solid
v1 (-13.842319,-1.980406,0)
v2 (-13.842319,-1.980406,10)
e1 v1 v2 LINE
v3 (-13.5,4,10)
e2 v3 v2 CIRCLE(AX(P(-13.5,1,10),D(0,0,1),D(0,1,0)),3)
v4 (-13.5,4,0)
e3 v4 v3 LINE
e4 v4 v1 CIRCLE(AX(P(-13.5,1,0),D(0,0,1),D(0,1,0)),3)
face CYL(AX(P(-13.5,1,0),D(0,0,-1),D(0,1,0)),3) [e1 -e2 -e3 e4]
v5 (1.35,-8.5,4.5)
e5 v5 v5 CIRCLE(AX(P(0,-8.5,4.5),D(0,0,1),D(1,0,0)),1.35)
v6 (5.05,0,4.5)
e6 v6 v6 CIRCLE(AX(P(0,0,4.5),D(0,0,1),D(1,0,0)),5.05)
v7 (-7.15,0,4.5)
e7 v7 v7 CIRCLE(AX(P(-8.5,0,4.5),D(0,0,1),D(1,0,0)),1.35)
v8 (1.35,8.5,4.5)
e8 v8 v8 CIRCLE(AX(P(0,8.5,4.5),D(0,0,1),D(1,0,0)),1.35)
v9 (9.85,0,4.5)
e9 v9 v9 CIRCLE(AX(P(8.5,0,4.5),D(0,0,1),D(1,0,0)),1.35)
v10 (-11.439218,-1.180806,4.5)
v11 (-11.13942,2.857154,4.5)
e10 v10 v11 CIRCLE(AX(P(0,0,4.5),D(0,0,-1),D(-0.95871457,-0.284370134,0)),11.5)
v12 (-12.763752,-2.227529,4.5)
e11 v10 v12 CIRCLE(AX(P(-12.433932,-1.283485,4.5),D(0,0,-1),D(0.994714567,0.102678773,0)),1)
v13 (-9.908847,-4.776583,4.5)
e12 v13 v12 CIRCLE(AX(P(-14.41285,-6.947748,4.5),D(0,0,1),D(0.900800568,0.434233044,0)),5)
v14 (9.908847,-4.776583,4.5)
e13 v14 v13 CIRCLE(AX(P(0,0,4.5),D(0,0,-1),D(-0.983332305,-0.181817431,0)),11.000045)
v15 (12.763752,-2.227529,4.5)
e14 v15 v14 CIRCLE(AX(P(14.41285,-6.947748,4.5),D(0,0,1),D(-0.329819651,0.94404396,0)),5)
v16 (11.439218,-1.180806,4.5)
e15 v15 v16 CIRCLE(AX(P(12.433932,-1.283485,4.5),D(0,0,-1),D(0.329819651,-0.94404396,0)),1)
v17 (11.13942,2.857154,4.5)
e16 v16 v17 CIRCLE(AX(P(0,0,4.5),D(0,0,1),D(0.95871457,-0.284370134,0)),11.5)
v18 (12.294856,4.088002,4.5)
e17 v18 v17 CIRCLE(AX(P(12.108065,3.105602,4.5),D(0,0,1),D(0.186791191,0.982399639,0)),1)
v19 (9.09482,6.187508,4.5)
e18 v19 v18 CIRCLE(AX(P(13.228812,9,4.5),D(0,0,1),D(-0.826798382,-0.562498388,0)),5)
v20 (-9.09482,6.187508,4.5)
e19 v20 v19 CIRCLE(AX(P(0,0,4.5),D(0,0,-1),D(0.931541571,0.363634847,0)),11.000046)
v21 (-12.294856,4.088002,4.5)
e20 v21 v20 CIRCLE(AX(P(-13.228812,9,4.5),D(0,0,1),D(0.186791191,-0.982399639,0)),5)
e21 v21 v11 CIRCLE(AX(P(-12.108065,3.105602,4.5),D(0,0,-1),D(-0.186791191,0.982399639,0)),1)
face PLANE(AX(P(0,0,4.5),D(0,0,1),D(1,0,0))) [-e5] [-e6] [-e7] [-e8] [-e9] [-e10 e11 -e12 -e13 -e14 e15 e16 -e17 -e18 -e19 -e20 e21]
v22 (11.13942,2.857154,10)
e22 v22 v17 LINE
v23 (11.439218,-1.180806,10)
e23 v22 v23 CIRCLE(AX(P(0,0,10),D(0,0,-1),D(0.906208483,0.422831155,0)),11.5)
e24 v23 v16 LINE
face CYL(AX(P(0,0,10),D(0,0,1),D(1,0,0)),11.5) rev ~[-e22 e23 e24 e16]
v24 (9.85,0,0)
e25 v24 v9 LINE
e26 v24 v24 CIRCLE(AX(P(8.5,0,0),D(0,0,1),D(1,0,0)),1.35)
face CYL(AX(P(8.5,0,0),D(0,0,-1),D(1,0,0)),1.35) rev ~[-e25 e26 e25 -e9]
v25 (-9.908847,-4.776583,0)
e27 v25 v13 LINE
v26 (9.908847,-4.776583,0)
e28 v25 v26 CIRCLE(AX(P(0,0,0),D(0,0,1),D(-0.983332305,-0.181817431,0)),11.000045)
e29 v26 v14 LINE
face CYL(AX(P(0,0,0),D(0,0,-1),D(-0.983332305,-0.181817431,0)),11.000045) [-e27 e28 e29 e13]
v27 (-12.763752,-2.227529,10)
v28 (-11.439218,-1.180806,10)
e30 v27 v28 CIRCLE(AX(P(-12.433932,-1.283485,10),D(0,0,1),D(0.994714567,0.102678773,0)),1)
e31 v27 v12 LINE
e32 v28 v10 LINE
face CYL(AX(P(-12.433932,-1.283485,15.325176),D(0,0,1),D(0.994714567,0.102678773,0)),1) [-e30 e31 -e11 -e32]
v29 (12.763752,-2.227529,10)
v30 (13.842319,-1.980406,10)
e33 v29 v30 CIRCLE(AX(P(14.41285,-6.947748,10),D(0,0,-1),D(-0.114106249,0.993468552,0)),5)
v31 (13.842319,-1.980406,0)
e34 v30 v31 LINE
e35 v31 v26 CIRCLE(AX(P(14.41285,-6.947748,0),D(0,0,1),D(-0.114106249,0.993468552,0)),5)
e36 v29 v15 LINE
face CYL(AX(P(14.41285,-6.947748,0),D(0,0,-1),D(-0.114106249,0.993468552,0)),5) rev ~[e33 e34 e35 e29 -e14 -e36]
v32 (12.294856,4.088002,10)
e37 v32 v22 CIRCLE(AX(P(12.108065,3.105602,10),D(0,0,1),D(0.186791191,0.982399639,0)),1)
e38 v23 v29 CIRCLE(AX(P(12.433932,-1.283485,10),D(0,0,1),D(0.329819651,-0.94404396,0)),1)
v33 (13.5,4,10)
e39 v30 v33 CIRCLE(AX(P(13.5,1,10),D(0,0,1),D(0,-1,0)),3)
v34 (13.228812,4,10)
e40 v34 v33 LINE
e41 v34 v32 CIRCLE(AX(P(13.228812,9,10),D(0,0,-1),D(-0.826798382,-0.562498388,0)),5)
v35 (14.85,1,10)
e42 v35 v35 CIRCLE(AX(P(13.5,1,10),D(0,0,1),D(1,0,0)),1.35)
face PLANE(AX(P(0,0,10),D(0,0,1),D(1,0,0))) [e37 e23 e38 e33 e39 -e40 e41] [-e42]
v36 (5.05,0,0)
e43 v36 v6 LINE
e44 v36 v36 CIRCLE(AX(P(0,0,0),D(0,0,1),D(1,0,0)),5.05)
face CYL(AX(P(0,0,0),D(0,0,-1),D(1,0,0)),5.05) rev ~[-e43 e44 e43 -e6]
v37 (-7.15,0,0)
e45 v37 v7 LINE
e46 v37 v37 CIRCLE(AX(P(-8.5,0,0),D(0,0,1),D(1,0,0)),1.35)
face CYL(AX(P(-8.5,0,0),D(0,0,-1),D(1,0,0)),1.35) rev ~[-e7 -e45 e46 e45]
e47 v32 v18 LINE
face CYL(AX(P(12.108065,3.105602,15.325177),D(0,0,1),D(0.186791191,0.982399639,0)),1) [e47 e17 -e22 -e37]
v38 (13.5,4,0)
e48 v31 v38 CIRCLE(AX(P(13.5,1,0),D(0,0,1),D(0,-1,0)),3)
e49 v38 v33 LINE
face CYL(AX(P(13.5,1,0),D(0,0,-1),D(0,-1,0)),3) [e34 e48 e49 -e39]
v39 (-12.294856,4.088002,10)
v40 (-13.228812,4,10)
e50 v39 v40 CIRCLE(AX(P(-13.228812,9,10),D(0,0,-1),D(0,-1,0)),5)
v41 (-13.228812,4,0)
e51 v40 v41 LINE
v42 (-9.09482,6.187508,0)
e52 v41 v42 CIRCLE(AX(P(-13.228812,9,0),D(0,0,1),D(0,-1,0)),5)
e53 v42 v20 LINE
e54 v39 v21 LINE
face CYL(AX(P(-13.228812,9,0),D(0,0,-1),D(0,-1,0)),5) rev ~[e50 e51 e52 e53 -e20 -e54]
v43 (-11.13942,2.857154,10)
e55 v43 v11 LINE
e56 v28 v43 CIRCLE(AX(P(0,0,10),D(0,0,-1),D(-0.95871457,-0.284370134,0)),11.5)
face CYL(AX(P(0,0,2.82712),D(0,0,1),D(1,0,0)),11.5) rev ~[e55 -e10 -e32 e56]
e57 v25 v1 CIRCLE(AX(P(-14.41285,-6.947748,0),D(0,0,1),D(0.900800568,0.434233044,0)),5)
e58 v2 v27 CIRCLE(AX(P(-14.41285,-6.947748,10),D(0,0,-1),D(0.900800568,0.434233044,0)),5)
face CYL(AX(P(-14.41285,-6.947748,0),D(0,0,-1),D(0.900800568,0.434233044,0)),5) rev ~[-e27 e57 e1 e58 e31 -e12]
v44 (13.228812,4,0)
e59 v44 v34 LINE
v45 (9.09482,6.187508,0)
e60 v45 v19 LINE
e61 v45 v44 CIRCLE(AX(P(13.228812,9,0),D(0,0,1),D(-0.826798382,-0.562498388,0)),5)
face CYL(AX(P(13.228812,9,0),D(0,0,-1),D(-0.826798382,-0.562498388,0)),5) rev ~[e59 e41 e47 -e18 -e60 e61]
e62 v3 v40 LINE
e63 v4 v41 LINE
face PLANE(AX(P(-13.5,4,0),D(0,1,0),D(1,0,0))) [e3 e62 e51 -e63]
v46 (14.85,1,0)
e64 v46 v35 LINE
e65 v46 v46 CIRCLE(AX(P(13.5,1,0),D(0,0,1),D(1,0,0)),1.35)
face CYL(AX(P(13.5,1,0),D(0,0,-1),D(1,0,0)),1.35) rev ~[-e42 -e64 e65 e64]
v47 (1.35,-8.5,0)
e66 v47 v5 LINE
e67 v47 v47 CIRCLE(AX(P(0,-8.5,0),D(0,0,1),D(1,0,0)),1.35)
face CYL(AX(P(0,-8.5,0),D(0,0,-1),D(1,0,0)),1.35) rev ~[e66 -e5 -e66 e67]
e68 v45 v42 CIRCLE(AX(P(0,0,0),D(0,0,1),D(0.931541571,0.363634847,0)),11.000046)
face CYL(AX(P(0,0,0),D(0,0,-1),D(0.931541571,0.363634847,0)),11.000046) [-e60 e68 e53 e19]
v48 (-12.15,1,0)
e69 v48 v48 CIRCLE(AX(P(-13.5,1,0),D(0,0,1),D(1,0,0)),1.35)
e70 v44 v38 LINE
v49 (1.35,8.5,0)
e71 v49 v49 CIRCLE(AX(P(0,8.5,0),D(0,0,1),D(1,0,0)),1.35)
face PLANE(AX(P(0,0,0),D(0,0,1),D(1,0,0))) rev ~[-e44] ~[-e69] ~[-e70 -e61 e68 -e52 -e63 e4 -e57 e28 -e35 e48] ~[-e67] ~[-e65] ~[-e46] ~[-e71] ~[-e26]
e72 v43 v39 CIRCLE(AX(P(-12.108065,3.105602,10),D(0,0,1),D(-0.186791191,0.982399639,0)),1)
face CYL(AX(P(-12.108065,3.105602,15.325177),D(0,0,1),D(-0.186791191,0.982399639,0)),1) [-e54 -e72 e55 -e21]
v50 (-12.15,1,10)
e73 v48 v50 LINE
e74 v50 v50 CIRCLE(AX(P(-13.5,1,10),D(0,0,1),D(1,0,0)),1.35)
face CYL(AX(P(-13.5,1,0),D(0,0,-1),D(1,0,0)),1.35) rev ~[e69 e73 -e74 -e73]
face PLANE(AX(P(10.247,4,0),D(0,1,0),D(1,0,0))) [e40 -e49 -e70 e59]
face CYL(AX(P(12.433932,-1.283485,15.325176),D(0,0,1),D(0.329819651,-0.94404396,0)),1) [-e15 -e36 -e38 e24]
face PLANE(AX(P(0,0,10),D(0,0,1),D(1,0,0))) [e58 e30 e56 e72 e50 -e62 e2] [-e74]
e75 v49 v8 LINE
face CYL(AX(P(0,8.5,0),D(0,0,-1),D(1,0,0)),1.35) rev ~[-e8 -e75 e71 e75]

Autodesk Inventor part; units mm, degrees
ref_plane "YZ Plane" through (0, 0, 0) normal (1, 0, 0) x (0, 1, 0)
ref_plane "XZ Plane" through (0, 0, 0) normal (0, 1, 0) x (-1, 0, 0)
ref_plane "XY Plane" through (0, 0, 0) normal (0, 0, 1) x (1, 0, 0)
sketch "スケッチ1" plane through (0, 0, 0) normal (0, 0, 1) x (1, 0, 0)
  circle A0 centre (0, 0) radius 11 construction
  circle A1 centre (0, 8.5) radius 1.35
  circle A2 centre (-8.5, 0) radius 1.35
  circle A3 centre (0, -8.5) radius 1.35
  circle A4 centre (8.5, 0) radius 1.35
  circle A5 centre (0, 0) radius 5.05
  circle A6 centre (-13.5, 1) radius 1.35
  circle A7 centre (13.5, 1) radius 1.35
  line L0 (-13.5, 15.0392) -> (13.5, 15.0392) construction
  line L1 (13.5, 15.0392) -> (13.5, 1) construction
  line L2 (13.5, 1) -> (-13.5, 1) construction
  line L3 (-13.5, 1) -> (-13.5, 15.0392) construction
  line L4 (-13.5, 4) -> (-10.247, 4)
  arc A8 (-13.5, 4) -> (-13.5, -2) centre (-13.5, 1) ccw
  line L5 (-13.5, -2) -> (-10.8167, -2)
  arc A9 (10.247, 4) -> (-10.247, 4) centre (0, 0) ccw
  arc A10 (-10.8167, -2) -> (10.8167, -2) centre (0, 0) ccw
  line L6 (10.247, 4) -> (13.5, 4)
  line L7 (10.8167, -2) -> (13.5, -2)
  arc A11 (13.5, -2) -> (13.5, 4) centre (13.5, 1) ccw
  point P0 (0, 15.0392)
  dimension "d0" = 22
  dimension "d1" = 2.7
  dimension "d2" = 8.5
  dimension "d5" = 360
  dimension "d7" = 10.1
  dimension "d8" = 2.7
  dimension "d9" = 27
  dimension "d10" = 1
  dimension "d11" = 3
extrude "押し出し1" add sketch "スケッチ1" along normal blind 10
sketch "スケッチ2" plane through (0, 0, 10) normal (0, 0, 1) x (1, 0, 0)
  circle A0 centre (0, 0) radius 5.05 projected
  circle A1 centre (8.5, 0) radius 1.35 projected
  circle A2 centre (0, -8.5) radius 1.35 projected
  circle A3 centre (-8.5, 0) radius 1.35 projected
  circle A4 centre (0, 8.5) radius 1.35 projected
  arc A5 (10.247, 4) -> (-10.247, 4) centre (0, 0) ccw projected
  circle A6 centre (0, 0) radius 11.5
  dimension "d14" = 0.5
extrude "押し出し2" cut sketch "スケッチ2" against normal blind 5.5
fillet "フィレット1" radius 5 4 edges at (10.8167, -2, 2.25) (-10.8167, -2, 2.25) (-10.247, 4, 2.25) (10.247, 4, 2.25)
fillet "フィレット2" radius 1 5 edges at (-10.4214, 4.8625, 7.25) (-11.0252, -3.2702, 7.25) (10.4214, 4.8625, 7.25) (11.4684, 0.8515, 4.5) (11.0252, -3.2702, 7.25)
properties part number "ジグ_1_1" material "アセタール樹脂、黒"
